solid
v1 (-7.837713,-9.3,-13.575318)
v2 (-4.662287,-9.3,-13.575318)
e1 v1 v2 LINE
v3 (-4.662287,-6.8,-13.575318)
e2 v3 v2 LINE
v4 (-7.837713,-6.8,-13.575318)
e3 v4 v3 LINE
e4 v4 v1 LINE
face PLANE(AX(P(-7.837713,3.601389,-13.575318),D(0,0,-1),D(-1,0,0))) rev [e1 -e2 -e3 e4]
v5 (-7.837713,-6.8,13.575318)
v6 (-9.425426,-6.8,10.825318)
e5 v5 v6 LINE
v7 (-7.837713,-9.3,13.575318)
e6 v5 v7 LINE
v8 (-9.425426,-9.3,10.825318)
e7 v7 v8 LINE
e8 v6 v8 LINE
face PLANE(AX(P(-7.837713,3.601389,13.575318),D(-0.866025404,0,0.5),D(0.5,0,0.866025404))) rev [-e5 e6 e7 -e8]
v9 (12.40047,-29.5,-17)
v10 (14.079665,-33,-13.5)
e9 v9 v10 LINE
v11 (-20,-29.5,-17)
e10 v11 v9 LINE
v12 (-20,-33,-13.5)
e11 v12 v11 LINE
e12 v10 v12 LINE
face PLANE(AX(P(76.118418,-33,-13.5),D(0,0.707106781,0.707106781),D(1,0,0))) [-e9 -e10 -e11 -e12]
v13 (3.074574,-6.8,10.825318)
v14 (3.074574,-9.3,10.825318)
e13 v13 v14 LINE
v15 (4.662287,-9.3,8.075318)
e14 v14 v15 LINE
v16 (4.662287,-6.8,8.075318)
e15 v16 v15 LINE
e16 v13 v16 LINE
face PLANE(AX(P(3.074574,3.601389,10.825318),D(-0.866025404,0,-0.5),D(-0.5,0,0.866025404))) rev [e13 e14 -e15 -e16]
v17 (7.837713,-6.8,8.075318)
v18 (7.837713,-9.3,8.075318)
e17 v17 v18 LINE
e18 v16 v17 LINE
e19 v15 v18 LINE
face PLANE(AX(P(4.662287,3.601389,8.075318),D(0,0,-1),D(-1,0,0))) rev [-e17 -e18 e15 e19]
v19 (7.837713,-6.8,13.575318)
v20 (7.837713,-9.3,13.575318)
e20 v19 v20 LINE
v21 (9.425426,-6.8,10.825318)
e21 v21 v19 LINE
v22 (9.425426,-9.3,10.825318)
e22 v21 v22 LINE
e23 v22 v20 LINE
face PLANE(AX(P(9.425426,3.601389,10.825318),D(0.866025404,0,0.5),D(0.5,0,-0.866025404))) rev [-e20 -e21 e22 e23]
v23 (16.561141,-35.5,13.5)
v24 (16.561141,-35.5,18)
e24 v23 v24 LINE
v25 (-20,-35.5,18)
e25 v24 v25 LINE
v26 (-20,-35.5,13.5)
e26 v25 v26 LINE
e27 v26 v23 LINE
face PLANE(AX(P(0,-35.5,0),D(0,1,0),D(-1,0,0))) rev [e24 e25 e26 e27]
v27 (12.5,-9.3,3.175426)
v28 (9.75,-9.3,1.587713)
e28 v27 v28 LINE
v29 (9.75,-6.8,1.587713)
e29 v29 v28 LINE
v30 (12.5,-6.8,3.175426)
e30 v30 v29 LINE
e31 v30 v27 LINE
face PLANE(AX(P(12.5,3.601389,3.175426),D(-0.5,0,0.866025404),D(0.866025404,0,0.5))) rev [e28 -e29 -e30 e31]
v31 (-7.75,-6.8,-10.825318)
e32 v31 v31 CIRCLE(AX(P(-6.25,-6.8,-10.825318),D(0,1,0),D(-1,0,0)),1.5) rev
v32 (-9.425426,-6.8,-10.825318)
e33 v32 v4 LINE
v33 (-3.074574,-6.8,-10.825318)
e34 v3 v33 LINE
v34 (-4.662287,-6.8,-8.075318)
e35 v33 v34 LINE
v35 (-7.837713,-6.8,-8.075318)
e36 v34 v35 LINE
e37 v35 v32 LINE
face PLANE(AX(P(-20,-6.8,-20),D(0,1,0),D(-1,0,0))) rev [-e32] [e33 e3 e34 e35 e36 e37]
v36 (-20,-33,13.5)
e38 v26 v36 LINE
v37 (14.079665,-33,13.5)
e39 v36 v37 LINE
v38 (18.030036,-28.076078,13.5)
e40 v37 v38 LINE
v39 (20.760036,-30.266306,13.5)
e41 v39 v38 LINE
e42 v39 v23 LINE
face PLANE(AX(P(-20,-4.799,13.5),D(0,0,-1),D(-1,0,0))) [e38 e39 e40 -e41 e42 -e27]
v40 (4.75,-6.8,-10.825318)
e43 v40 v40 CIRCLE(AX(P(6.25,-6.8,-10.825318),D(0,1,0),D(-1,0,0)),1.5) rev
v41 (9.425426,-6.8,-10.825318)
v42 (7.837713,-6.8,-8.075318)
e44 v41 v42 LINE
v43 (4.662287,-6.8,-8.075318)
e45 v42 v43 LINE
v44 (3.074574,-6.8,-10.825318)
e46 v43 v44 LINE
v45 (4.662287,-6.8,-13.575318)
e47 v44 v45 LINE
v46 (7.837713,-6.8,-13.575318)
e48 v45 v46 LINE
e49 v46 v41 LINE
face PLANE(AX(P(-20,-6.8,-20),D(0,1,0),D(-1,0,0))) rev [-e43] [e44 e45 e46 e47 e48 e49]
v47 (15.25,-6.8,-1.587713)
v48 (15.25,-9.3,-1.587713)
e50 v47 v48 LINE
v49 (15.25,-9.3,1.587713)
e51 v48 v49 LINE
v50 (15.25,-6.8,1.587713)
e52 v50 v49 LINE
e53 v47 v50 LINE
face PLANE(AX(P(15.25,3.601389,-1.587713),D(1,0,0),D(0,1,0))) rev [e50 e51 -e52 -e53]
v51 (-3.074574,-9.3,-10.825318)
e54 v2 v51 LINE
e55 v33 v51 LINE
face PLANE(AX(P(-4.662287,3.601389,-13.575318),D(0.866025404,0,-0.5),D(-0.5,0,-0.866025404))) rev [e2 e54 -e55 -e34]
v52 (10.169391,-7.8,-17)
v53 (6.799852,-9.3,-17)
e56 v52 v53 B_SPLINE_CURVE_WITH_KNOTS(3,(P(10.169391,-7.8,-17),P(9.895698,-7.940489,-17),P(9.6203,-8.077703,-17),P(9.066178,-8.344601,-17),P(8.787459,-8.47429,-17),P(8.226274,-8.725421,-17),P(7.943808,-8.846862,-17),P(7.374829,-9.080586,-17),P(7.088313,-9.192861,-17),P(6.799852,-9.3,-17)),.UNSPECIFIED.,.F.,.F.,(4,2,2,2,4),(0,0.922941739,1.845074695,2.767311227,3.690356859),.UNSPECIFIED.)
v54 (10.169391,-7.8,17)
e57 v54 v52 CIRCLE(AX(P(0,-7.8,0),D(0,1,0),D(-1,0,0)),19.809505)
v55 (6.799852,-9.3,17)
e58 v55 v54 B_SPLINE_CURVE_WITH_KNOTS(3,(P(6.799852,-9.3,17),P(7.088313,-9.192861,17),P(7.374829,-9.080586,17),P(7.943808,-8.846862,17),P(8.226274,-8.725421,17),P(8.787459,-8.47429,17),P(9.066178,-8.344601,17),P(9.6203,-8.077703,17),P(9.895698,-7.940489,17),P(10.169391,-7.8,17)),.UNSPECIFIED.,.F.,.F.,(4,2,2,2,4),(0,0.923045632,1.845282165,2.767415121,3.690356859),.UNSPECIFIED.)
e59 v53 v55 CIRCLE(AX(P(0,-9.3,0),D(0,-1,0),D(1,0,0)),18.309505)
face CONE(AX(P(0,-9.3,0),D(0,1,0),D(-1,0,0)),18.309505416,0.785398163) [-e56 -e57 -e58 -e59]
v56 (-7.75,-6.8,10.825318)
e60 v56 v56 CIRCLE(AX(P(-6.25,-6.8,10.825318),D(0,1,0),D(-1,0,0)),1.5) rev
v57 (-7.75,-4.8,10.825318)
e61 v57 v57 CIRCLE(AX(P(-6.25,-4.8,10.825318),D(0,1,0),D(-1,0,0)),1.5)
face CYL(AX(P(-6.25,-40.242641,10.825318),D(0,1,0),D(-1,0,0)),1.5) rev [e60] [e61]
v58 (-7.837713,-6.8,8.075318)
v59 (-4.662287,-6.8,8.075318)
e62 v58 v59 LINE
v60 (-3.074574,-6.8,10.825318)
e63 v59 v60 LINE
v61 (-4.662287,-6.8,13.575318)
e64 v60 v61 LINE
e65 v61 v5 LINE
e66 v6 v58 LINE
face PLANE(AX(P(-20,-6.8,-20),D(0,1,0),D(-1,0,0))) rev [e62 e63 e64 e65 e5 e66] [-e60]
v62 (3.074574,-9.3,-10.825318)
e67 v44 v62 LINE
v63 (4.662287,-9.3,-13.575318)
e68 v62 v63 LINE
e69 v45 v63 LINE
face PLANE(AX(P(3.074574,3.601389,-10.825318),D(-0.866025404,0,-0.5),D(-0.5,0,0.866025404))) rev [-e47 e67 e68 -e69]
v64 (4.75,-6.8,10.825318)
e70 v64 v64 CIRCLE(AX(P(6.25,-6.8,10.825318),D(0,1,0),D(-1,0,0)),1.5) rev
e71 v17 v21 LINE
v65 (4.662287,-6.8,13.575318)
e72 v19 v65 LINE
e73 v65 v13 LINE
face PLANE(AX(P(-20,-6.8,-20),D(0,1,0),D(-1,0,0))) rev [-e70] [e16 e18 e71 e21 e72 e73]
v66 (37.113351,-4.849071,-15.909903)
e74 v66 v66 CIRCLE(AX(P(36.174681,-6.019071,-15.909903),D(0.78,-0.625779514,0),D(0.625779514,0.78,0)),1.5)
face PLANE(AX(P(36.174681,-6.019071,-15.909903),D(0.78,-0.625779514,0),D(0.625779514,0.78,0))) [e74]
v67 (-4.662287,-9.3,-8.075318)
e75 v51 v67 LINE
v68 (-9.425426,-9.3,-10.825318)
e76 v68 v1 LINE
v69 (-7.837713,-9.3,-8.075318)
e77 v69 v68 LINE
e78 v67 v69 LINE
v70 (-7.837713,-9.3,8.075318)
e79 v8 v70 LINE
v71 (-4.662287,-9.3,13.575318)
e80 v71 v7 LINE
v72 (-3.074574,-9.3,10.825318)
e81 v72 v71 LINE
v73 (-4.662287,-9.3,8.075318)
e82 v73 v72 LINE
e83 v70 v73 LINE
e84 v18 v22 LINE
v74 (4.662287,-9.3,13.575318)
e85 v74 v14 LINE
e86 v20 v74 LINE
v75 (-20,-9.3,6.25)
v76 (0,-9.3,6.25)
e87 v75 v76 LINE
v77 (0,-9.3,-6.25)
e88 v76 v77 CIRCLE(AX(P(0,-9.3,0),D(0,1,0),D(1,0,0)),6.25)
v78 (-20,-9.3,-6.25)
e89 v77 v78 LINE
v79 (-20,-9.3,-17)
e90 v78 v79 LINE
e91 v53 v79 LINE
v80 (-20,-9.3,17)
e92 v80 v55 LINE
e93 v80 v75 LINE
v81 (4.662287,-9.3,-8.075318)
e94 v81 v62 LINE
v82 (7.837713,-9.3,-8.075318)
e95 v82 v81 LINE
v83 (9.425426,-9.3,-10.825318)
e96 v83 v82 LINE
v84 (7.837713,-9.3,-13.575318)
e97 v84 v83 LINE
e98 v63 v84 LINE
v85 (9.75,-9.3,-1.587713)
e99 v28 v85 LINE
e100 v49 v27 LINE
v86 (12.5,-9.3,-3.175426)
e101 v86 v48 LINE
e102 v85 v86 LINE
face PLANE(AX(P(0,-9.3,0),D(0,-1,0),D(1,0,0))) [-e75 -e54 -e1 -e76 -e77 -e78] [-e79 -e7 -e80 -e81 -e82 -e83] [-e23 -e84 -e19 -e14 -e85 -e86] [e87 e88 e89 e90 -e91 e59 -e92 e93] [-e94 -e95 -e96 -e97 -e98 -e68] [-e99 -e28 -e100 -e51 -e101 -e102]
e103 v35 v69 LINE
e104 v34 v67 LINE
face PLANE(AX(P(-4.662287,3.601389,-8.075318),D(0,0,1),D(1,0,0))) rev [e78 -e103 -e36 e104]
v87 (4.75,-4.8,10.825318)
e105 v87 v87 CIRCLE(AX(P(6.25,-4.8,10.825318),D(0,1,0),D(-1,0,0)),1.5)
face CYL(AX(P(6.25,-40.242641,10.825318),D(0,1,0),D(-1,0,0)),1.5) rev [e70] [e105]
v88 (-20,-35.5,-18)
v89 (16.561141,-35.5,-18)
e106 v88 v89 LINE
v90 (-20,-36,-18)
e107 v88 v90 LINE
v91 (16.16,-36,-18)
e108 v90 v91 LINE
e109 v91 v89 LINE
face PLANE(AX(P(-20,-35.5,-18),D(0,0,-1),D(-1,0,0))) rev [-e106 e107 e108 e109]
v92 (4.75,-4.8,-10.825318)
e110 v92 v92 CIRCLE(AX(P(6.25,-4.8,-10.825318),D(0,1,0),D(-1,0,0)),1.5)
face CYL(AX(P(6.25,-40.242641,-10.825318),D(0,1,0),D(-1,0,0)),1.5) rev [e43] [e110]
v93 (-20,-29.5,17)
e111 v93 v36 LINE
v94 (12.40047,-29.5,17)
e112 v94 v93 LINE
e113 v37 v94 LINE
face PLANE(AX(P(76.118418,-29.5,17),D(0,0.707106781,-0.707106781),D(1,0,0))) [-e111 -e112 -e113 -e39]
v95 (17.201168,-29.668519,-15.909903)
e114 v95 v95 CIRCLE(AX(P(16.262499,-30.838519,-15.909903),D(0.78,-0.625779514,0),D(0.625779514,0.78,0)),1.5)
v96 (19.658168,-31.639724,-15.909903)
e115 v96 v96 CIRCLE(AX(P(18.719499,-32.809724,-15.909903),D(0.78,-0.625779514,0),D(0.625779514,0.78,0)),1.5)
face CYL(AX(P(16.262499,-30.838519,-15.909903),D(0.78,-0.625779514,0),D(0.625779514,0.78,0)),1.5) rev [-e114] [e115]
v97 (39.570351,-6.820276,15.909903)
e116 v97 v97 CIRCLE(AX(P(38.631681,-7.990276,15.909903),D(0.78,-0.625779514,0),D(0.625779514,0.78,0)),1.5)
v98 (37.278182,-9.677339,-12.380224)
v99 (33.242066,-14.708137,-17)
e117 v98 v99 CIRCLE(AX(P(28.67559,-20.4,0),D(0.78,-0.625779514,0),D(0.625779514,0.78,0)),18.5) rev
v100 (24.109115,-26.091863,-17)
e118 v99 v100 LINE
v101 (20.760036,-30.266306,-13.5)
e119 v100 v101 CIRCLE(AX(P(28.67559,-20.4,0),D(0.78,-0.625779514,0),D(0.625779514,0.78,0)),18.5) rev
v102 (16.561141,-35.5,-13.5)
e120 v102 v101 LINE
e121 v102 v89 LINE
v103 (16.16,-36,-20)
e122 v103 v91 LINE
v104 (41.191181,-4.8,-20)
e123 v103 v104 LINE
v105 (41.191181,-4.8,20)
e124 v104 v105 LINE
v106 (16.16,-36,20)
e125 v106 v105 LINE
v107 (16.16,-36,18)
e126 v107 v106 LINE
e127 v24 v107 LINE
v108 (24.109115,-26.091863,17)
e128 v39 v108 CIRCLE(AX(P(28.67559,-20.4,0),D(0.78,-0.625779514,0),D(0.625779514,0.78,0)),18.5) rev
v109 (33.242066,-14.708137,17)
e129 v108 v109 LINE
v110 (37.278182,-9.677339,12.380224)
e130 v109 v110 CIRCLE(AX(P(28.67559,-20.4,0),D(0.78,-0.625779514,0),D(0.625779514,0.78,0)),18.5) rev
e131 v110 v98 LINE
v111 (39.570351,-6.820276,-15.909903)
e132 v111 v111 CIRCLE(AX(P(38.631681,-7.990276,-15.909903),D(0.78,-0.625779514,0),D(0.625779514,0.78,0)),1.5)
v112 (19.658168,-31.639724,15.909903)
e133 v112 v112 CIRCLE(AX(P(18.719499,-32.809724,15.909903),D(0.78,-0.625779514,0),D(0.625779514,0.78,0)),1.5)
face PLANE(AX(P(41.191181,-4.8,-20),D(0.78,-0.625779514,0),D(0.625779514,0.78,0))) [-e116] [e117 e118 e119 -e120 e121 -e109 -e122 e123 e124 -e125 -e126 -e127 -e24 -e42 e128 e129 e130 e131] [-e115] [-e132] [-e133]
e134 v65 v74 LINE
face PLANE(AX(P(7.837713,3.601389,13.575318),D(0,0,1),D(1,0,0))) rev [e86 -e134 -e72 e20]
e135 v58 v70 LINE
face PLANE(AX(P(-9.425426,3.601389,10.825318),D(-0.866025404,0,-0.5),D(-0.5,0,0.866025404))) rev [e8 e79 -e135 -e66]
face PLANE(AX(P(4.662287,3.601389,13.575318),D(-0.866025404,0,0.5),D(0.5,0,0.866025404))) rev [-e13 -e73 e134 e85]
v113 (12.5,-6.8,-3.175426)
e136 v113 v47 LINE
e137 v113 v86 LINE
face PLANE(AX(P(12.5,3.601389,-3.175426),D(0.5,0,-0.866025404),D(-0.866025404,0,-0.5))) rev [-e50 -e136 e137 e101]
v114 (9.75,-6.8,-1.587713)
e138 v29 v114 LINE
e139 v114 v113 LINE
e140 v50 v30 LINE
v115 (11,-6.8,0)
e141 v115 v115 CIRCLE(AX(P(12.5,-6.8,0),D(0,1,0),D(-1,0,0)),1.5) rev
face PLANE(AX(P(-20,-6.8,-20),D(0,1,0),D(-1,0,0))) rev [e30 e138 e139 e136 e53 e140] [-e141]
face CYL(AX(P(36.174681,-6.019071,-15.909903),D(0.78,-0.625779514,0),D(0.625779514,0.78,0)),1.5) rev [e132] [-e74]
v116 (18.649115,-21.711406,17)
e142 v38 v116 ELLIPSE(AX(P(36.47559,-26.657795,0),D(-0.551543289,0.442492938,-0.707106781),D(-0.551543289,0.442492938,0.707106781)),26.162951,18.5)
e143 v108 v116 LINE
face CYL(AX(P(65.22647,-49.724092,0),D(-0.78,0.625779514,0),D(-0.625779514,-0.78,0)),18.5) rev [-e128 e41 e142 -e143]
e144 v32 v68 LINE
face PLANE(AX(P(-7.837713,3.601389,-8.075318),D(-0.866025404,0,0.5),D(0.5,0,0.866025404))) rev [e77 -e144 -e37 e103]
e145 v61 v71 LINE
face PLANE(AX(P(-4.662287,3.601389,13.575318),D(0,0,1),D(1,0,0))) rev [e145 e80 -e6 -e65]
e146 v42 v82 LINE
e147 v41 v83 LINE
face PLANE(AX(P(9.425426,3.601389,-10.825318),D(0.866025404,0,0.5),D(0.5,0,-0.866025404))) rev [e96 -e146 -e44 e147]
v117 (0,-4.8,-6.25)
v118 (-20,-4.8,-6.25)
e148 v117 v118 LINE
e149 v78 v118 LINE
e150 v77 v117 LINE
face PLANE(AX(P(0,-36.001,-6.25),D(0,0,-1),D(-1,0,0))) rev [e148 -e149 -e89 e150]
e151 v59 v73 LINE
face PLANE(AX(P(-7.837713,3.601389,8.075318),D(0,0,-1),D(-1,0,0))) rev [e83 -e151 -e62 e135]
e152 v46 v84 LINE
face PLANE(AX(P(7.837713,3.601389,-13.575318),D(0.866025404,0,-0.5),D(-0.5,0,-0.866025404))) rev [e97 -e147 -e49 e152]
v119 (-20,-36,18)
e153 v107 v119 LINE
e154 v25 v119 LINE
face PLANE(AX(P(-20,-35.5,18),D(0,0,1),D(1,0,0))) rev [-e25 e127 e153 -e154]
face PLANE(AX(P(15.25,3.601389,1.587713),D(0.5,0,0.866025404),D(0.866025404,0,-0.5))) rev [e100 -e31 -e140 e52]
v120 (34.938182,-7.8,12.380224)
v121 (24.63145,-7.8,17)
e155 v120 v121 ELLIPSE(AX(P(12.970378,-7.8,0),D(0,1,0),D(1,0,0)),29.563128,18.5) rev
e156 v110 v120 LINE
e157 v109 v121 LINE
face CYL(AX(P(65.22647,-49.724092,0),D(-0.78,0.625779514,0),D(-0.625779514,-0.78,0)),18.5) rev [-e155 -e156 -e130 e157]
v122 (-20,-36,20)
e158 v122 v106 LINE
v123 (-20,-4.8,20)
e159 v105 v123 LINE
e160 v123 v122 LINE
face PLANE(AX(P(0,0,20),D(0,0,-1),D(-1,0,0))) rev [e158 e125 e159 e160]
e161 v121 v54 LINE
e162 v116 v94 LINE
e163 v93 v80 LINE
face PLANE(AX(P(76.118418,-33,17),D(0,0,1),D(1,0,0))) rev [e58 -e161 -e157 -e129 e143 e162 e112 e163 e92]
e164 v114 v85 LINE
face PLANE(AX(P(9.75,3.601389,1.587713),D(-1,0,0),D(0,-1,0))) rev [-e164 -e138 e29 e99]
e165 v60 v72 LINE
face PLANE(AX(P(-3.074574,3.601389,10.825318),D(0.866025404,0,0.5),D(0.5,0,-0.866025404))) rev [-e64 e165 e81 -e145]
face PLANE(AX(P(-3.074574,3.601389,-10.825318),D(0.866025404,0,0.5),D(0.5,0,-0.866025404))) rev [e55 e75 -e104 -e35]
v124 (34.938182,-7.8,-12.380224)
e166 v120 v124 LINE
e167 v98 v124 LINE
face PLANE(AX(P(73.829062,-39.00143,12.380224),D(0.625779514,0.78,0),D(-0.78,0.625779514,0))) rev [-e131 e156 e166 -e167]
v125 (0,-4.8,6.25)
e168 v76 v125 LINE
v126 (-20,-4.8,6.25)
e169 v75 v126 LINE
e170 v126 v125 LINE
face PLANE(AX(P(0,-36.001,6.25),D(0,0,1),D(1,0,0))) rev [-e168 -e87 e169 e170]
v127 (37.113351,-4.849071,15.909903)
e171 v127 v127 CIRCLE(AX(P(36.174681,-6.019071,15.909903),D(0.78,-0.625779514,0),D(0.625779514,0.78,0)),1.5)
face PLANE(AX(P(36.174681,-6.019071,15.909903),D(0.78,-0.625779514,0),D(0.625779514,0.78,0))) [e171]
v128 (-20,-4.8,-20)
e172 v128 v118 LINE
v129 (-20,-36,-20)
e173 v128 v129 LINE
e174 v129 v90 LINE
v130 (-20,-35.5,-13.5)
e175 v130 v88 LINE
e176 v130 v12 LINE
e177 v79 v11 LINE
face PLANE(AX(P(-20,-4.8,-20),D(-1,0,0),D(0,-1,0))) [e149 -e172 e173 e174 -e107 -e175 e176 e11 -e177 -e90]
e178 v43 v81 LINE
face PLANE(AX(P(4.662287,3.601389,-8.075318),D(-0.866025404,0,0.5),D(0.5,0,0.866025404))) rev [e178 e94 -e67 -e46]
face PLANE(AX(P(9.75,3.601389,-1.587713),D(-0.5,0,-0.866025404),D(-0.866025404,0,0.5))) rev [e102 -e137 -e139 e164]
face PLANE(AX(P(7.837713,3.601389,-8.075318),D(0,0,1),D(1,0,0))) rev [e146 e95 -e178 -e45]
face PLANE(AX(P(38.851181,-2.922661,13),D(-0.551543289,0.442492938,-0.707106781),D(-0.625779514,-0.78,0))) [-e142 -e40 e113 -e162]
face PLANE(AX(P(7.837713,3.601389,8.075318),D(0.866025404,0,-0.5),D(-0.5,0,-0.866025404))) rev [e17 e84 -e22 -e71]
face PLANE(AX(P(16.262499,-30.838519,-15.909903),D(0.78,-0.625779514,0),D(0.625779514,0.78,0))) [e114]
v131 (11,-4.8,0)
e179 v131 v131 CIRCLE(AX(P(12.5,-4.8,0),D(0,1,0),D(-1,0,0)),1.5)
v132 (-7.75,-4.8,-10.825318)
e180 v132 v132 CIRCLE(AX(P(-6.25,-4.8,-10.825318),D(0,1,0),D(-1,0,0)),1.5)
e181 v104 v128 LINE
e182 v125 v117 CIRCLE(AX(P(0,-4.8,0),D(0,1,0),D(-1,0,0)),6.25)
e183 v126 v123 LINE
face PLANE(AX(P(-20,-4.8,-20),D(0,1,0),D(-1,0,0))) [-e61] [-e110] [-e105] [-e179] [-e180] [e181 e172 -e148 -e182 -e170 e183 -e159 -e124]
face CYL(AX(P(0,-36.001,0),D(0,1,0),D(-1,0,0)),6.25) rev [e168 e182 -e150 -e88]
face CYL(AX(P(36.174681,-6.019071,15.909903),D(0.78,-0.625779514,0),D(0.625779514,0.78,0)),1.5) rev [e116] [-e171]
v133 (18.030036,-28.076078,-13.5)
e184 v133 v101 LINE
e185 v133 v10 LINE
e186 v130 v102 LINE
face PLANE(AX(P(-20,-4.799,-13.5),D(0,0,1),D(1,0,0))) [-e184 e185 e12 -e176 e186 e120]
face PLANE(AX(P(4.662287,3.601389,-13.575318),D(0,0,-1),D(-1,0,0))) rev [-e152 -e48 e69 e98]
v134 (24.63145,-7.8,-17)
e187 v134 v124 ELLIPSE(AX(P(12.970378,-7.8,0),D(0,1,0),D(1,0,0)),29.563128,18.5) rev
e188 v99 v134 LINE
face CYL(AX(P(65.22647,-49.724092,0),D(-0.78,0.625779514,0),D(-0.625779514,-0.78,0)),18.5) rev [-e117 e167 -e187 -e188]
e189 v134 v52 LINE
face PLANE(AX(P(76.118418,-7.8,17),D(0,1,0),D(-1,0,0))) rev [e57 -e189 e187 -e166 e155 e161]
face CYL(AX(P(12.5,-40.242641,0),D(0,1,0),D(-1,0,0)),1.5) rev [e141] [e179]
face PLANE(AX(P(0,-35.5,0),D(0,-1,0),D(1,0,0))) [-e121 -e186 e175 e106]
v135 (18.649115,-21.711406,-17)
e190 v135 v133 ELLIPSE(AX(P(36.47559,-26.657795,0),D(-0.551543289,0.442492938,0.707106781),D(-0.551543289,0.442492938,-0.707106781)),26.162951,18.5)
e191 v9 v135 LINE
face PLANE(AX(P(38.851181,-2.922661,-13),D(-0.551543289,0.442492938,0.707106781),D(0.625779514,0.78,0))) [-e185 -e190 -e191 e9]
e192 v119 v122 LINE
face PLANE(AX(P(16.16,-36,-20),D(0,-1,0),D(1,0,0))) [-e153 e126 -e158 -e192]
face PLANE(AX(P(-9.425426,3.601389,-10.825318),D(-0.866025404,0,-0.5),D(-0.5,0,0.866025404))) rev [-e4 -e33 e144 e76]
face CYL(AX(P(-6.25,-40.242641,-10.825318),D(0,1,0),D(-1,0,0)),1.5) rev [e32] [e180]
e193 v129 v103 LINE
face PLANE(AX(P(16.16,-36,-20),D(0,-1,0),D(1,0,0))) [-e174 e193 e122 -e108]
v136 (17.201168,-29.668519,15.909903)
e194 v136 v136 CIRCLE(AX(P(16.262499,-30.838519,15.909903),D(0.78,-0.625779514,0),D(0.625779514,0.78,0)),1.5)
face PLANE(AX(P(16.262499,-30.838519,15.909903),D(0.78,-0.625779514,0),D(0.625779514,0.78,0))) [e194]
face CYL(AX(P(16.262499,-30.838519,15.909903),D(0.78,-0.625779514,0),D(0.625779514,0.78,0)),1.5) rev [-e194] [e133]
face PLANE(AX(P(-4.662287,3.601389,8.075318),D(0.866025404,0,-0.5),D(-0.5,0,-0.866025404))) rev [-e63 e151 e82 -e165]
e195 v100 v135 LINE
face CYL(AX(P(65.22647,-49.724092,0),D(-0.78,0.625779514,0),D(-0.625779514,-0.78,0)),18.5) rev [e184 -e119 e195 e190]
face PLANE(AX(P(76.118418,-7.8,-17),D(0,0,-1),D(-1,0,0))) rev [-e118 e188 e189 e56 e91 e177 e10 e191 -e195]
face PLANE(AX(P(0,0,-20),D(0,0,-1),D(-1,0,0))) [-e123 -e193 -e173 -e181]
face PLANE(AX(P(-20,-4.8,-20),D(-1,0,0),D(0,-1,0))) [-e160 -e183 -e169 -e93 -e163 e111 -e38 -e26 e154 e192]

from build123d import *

# Parameters (mm, degrees)
BOSS_EXTRUDE1_DEPTH            = 20
BOSS_EXTRUDE1_DEPTH_BACK       = 20
CUT_EXTRUDE1_REACH             = 75.759
SKETCH3_W                      = 34
SKETCH3_H                      = 25.2
CUT_EXTRUDE2_DEPTH             = 3
CUT_EXTRUDE3_REACH             = 57.409
CUT_EXTRUDE4_REACH             = 57.409
SKETCH7_R                      = 1.5
SKETCH6_R                      = 1.5
BOSS_EXTRUDE2_DEPTH            = 1.5
CHAMFER3_SIZE                  = 1.5
CUT_EXTRUDE5_DEPTH             = 2.5
CUT_EXTRUDE6_REACH             = 55.777
SKETCH9_W                      = 44.905987645
SKETCH9_H                      = 27
CUT_EXTRUDE6_DIRECTION_2_REACH = 55.777
BOSS_EXTRUDE3_REACH            = 53.8
CHAMFER1_SIZE                  = 4
CHAMFER2_SIZE                  = 3.5
SKETCH11_W                     = 40.505645026
SKETCH11_H                     = 4.5
CUT_EXTRUDE7_DEPTH             = 0.5
SKETCH13_R                     = 1.5
CUT_EXTRUDE8_DEPTH             = 3.15


# Some blends are built 0.0001 mm under size
with BuildPart() as part:
    # Sketch1 → Boss-Extrude1 (new, two sides: drawn at the far end of the back side and taken through both)
    with BuildSketch(Plane.XY.offset(-BOSS_EXTRUDE1_DEPTH_BACK)):
        Polygon((-20, -4.8), (41.191180555, -4.8), (16.16, -36), (-20, -36), align=None)
    extrude(amount=BOSS_EXTRUDE1_DEPTH + BOSS_EXTRUDE1_DEPTH_BACK)

    # Cut-Extrude1: up to this plane
    cut_extrude1_end = Plane(origin=(38.851180555, -2.922661458, -20), z_dir=(0.7799999999999999, -0.6257795138864808, 0))
    # Sketch3 → Cut-Extrude1 (cut, up to the surface)
    with BuildSketch(Plane.ZY.offset(20), mode=Mode.PRIVATE) as cut_extrude1_sk1:
        with Locations((0, -20.4)):
            Rectangle(SKETCH3_W, SKETCH3_H)
    cut_extrude1_tool1 = split(extrude(cut_extrude1_sk1.sketch, amount=-CUT_EXTRUDE1_REACH, mode=Mode.PRIVATE), bisect_by=cut_extrude1_end, keep=Keep.BOTH, mode=Mode.PRIVATE)
    add(cut_extrude1_tool1.solids().sort_by_distance((-20, -20.4, 0))[0], mode=Mode.SUBTRACT)

    # Sketch4 → Cut-Extrude2 (cut)
    with BuildSketch(Plane(origin=(25.06363275, -20.108087075, 0), x_dir=(0, 0, 1), z_dir=(-0.78, 0.6257795138864807, 0))):
        with BuildLine():
            Line((-17, 9.329856704), (-17, -5.264662815))
            ThreePointArc((-17, -5.264662815), (0, -16.467403056), (17, -5.264662815))
            Line((17, -5.264662815), (17, 9.329856704))
            ThreePointArc((17, 9.329856704), (15.039919545, 12.805285563), (12.38022373, 15.779598814))
            Line((12.38022373, 15.779598814), (-12.38022373, 15.779598814))
            ThreePointArc((-12.38022373, 15.779598814), (-15.039919545, 12.805285563), (-17, 9.329856704))
        make_face()
    extrude(amount=-CUT_EXTRUDE2_DEPTH, mode=Mode.SUBTRACT)

    # Sketch5 → Cut-Extrude3 (cut, up to next)
    with BuildSketch(Plane(origin=(0, -4.8, 0), x_dir=(1, 0, 0), z_dir=(0, 1, 0)), mode=Mode.PRIVATE) as cut_extrude3_sk1:
        with BuildLine():
            Line((0, 6.25), (-20, 6.25))
            Line((-20, 6.25), (-20, -6.25))
            Line((-20, -6.25), (0, -6.25))
            ThreePointArc((0, -6.25), (6.25, 0), (0, 6.25))
        make_face()
    cut_extrude3_tool1 = extrude(cut_extrude3_sk1.sketch, amount=-CUT_EXTRUDE3_REACH, mode=Mode.PRIVATE) & part.part
    add(cut_extrude3_tool1.solids().sort_by_distance((-7.506569, -4.8, 0))[0], mode=Mode.SUBTRACT)

    # Cut-Extrude4: up to this face of the body (flat: up to its plane)
    cut_extrude4_end = Plane(part.part.faces().sort_by_distance((-1.92, -36, 0))[0])
    # Sketch7 → Cut-Extrude4 (cut, up to the picked face)
    with BuildSketch(Plane(origin=(0, -4.8, 0), x_dir=(1, 0, 0), z_dir=(0, 1, 0)), mode=Mode.PRIVATE) as cut_extrude4_sk1:
        with Locations(Location((12.5, 0, 0), (0, 0, 180))):
            Circle(SKETCH7_R)
    cut_extrude4_tool1 = split(extrude(cut_extrude4_sk1.sketch, amount=-CUT_EXTRUDE4_REACH, mode=Mode.PRIVATE), bisect_by=cut_extrude4_end, keep=Keep.BOTH, mode=Mode.PRIVATE)
    # Sketch7 → Cut-Extrude4 (cut, up to the picked face)
    with BuildSketch(Plane(origin=(0, -4.8, 0), x_dir=(1, 0, 0), z_dir=(0, 1, 0)), mode=Mode.PRIVATE) as cut_extrude4_sk2:
        with Locations(Location((6.25, -10.825317547, 0), (0, 0, 180))):
            Circle(SKETCH7_R)
    cut_extrude4_tool2 = split(extrude(cut_extrude4_sk2.sketch, amount=-CUT_EXTRUDE4_REACH, mode=Mode.PRIVATE), bisect_by=cut_extrude4_end, keep=Keep.BOTH, mode=Mode.PRIVATE)
    # Sketch7 → Cut-Extrude4 (cut, up to the picked face)
    with BuildSketch(Plane(origin=(0, -4.8, 0), x_dir=(1, 0, 0), z_dir=(0, 1, 0)), mode=Mode.PRIVATE) as cut_extrude4_sk3:
        with Locations(Location((-6.25, -10.825317547, 0), (0, 0, 180))):
            Circle(SKETCH7_R)
    cut_extrude4_tool3 = split(extrude(cut_extrude4_sk3.sketch, amount=-CUT_EXTRUDE4_REACH, mode=Mode.PRIVATE), bisect_by=cut_extrude4_end, keep=Keep.BOTH, mode=Mode.PRIVATE)
    # Sketch7 → Cut-Extrude4 (cut, up to the picked face)
    with BuildSketch(Plane(origin=(0, -4.8, 0), x_dir=(1, 0, 0), z_dir=(0, 1, 0)), mode=Mode.PRIVATE) as cut_extrude4_sk4:
        with Locations((-12.5, 0)):
            Circle(SKETCH7_R)
    cut_extrude4_tool4 = split(extrude(cut_extrude4_sk4.sketch, amount=-CUT_EXTRUDE4_REACH, mode=Mode.PRIVATE), bisect_by=cut_extrude4_end, keep=Keep.BOTH, mode=Mode.PRIVATE)
    # Sketch7 → Cut-Extrude4 (cut, up to the picked face)
    with BuildSketch(Plane(origin=(0, -4.8, 0), x_dir=(1, 0, 0), z_dir=(0, 1, 0)), mode=Mode.PRIVATE) as cut_extrude4_sk5:
        with Locations(Location((-6.25, 10.825317547, 0), (0, 0, 180))):
            Circle(SKETCH7_R)
    cut_extrude4_tool5 = split(extrude(cut_extrude4_sk5.sketch, amount=-CUT_EXTRUDE4_REACH, mode=Mode.PRIVATE), bisect_by=cut_extrude4_end, keep=Keep.BOTH, mode=Mode.PRIVATE)
    # Sketch7 → Cut-Extrude4 (cut, up to the picked face)
    with BuildSketch(Plane(origin=(0, -4.8, 0), x_dir=(1, 0, 0), z_dir=(0, 1, 0)), mode=Mode.PRIVATE) as cut_extrude4_sk6:
        with Locations(Location((6.25, 10.825317547, 0), (0, 0, 180))):
            Circle(SKETCH7_R)
    cut_extrude4_tool6 = split(extrude(cut_extrude4_sk6.sketch, amount=-CUT_EXTRUDE4_REACH, mode=Mode.PRIVATE), bisect_by=cut_extrude4_end, keep=Keep.BOTH, mode=Mode.PRIVATE)
    add(cut_extrude4_tool1.solids().sort_by(Axis((12.5, -4.8, 0), (0, -1, 0)))[0], mode=Mode.SUBTRACT)
    add(cut_extrude4_tool2.solids().sort_by(Axis((6.25, -4.8, 10.825318), (0, -1, 0)))[0], mode=Mode.SUBTRACT)
    add(cut_extrude4_tool3.solids().sort_by(Axis((-6.25, -4.8, 10.825318), (0, -1, 0)))[0], mode=Mode.SUBTRACT)
    add(cut_extrude4_tool4.solids().sort_by(Axis((-12.5, -4.8, 0), (0, -1, 0)))[0], mode=Mode.SUBTRACT)
    add(cut_extrude4_tool5.solids().sort_by(Axis((-6.25, -4.8, -10.825318), (0, -1, 0)))[0], mode=Mode.SUBTRACT)
    add(cut_extrude4_tool6.solids().sort_by(Axis((6.25, -4.8, -10.825318), (0, -1, 0)))[0], mode=Mode.SUBTRACT)

    # Sketch6 → Boss-Extrude2 (add)
    with BuildSketch(Plane.XZ.offset(7.8)):
        with BuildLine():
            Line((0, 6.25), (-17.209749811, 6.25))
            Line((-17.209749811, 6.25), (-20, 6.25))
            Line((-20, 6.25), (-20, 18.309505416))
            Line((-20, 18.309505416), (0, 18.309505416))
            ThreePointArc((0, 18.309505416), (18.309505416, 0), (0, -18.309505416))
            Line((0, -18.309505416), (-20, -18.309505416))
            Line((-20, -18.309505416), (-20, -6.25))
            Line((-20, -6.25), (-17.209749811, -6.25))
            Line((-17.209749811, -6.25), (0, -6.25))
            ThreePointArc((0, -6.25), (6.25, 0), (0, 6.25))
        make_face()
        with Locations(Location((-6.25, 10.825317547, 0), (0, 0, 180))):
            Circle(SKETCH6_R, mode=Mode.SUBTRACT)
        with Locations(Location((6.25, 10.825317547, 0), (0, 0, 180))):
            Circle(SKETCH6_R, mode=Mode.SUBTRACT)
        with Locations(Location((12.5, 0, 0), (0, 0, 180))):
            Circle(SKETCH6_R, mode=Mode.SUBTRACT)
        with Locations(Location((6.25, -10.825317547, 0), (0, 0, 180))):
            Circle(SKETCH6_R, mode=Mode.SUBTRACT)
        with Locations(Location((-6.25, -10.825317547, 0), (0, 0, 180))):
            Circle(SKETCH6_R, mode=Mode.SUBTRACT)
    extrude(amount=BOSS_EXTRUDE2_DEPTH)

    # Chamfer3
    chamfer3_edges = [part.edges().sort_by_distance(p)[0] for p in [
        (18.309505416, -7.8, 0),
    ]]
    chamfer(chamfer3_edges, length=CHAMFER3_SIZE - 0.0001)  # a hair under: the kernel refuses the full size

    # Sketch8 → Cut-Extrude5 (cut)
    with BuildSketch(Plane.XZ.offset(9.3)):
        Polygon((12.5, 3.175426481), (9.75, 1.58771324), (9.75, -1.58771324), (12.5, -3.175426481), (15.25, -1.58771324), (15.25, 1.58771324), align=None)
        Polygon((9.425426481, 10.825317547), (7.83771324, 13.575317547), (4.66228676, 13.575317547), (3.074573519, 10.825317547), (4.66228676, 8.075317547), (7.83771324, 8.075317547), align=None)
        Polygon((-3.074573519, 10.825317547), (-4.66228676, 13.575317547), (-7.83771324, 13.575317547), (-9.425426481, 10.825317547), (-7.83771324, 8.075317547), (-4.66228676, 8.075317547), align=None)
        Polygon((-3.074573519, -10.825317547), (-4.66228676, -8.075317547), (-7.83771324, -8.075317547), (-9.425426481, -10.825317547), (-7.83771324, -13.575317547), (-4.66228676, -13.575317547), align=None)
        Polygon((9.425426481, -10.825317547), (7.83771324, -8.075317547), (4.66228676, -8.075317547), (3.074573519, -10.825317547), (4.66228676, -13.575317547), (7.83771324, -13.575317547), align=None)
    extrude(amount=-CUT_EXTRUDE5_DEPTH, mode=Mode.SUBTRACT)

    # Sketch9 → Cut-Extrude6 (cut, up to next)
    with BuildSketch(Plane(origin=(0, -33, 0), x_dir=(1, 0, 0), z_dir=(0, 1, 0)), mode=Mode.PRIVATE) as cut_extrude6_sk1:
        with Locations((2.452993823, 0)):
            Rectangle(SKETCH9_W, SKETCH9_H)
    cut_extrude6_tool1 = extrude(cut_extrude6_sk1.sketch, amount=-CUT_EXTRUDE6_REACH, mode=Mode.PRIVATE) & part.part
    add(cut_extrude6_tool1.solids().sort_by_distance((2.452994, -33, 0))[0], mode=Mode.SUBTRACT)

    # Sketch9 → Cut-Extrude6 direction 2 (cut, up to next)
    with BuildSketch(Plane(origin=(0, -33, 0), x_dir=(1, 0, 0), z_dir=(0, 1, 0)), mode=Mode.PRIVATE) as cut_extrude6_direction_2_sk1:
        with Locations((2.452993823, 0)):
            Rectangle(SKETCH9_W, SKETCH9_H)
    cut_extrude6_direction_2_tool1 = extrude(cut_extrude6_direction_2_sk1.sketch, amount=CUT_EXTRUDE6_DIRECTION_2_REACH, mode=Mode.PRIVATE) & part.part
    add(cut_extrude6_direction_2_tool1.solids().sort_by_distance((2.452994, -33, 0))[0], mode=Mode.SUBTRACT)

    # Sketch10 → Boss-Extrude3 (add, up to next)
    with BuildSketch(Plane(origin=(25.06363275, -20.108087075, 0), x_dir=(0, 0, 1), z_dir=(-0.78, 0.6257795138864807, 0)), mode=Mode.PRIVATE) as boss_extrude3_sk1:
        with BuildLine():
            Line((17, 9.329856704), (17, 15.779598814))
            Line((17, 15.779598814), (12.38022373, 15.779598814))
            ThreePointArc((12.38022373, 15.779598814), (15.039919545, 12.805285563), (17, 9.329856704))
        make_face()
    boss_extrude3_tool1 = extrude(boss_extrude3_sk1.sketch, amount=BOSS_EXTRUDE3_REACH, mode=Mode.PRIVATE) - part.part
    # Sketch10 → Boss-Extrude3 (add, up to next)
    with BuildSketch(Plane(origin=(25.06363275, -20.108087075, 0), x_dir=(0, 0, 1), z_dir=(-0.78, 0.6257795138864807, 0)), mode=Mode.PRIVATE) as boss_extrude3_sk2:
        with BuildLine():
            Line((-12.38022373, 15.779598814), (-17, 15.779598814))
            Line((-17, 15.779598814), (-17, 9.329856704))
            ThreePointArc((-17, 9.329856704), (-15.039919545, 12.805285563), (-12.38022373, 15.779598814))
        make_face()
    boss_extrude3_tool2 = extrude(boss_extrude3_sk2.sketch, amount=BOSS_EXTRUDE3_REACH, mode=Mode.PRIVATE) - part.part
    add(boss_extrude3_tool1.solids().sort_by_distance((33.70308, -9.339488, 15.573959))[0])
    add(boss_extrude3_tool2.solids().sort_by_distance((33.70308, -9.339488, -15.573959))[0])

    # Chamfer1
    # the kernel refuses this chamfer: 4 mm, written as the material it adds along each edge
    with BuildSketch(Plane(origin=(28.206340733, -16.190873148, -17), x_dir=(-0.7797050951908114, 0.6255429172350234, -0.02749587661058647), z_dir=(-0.6257795138864808, -0.7799999999999999, 0))) as chamfer1_piece_1_section:
        Polygon((CHAMFER1_SIZE * 0.999621916911, -CHAMFER1_SIZE * 0.0274958766106), (-CHAMFER1_SIZE * 0.0274958766106, -CHAMFER1_SIZE * 0.999621916911), (0, 0), align=None)
    chamfer1_piece_1 = extrude(amount=31.836894582, mode=Mode.PRIVATE)
    chamfer1_piece_1 = split(chamfer1_piece_1, bisect_by=Plane(origin=(16.061091739, -28.954015424, -13.5), z_dir=(0, 0, -1)), keep=Keep.TOP, mode=Mode.PRIVATE)
    chamfer1_piece_1 = split(chamfer1_piece_1, bisect_by=Plane(origin=(16.061091739, -33, -15.864251998), z_dir=(0, 1, 0)), keep=Keep.TOP, mode=Mode.PRIVATE)
    chamfer1_piece_1 = chamfer1_piece_1 - Plane(origin=(25.176212906, -17.592514525, 0), x_dir=(-0.24683652243813084, -0.30766824932634074, -0.9189189189189191), z_dir=(-0.78, 0.6257795138864807, 0)) * Cylinder(18.5, 80, mode=Mode.PRIVATE)
    add(chamfer1_piece_1)
    with BuildSketch(Plane(origin=(8.283464318, -41.023650922, 17), x_dir=(-0.7797050951908113, 0.6255429172350233, 0.02749587661058642), z_dir=(0.6257795138864808, 0.7799999999999999, 0))) as chamfer1_piece_2_section:
        Polygon((CHAMFER1_SIZE * 0.999621916911, -CHAMFER1_SIZE * 0.0274958766106), (-CHAMFER1_SIZE * 0.0274958766106, -CHAMFER1_SIZE * 0.999621916911), (0, 0), align=None)
    chamfer1_piece_2 = extrude(amount=31.836894582, mode=Mode.PRIVATE)
    chamfer1_piece_2 = split(chamfer1_piece_2, bisect_by=Plane(origin=(16.061091739, -28.954015425, 13.5), z_dir=(0, 0, 1)), keep=Keep.TOP, mode=Mode.PRIVATE)
    chamfer1_piece_2 = chamfer1_piece_2 - Plane(origin=(25.176212906, -17.592514525, 0), x_dir=(-0.24683652243813084, -0.30766824932634074, -0.9189189189189191), z_dir=(-0.78, 0.6257795138864807, 0)) * Cylinder(18.5, 80, mode=Mode.PRIVATE)
    chamfer1_piece_2 = split(chamfer1_piece_2, bisect_by=Plane(origin=(16.061091739, -33, 15.864251998), z_dir=(0, 1, 0)), keep=Keep.TOP, mode=Mode.PRIVATE)
    add(chamfer1_piece_2)

    # Chamfer2
    chamfer2_edges = [part.edges().sort_by_distance(p)[0] for p in [
        (-5.203757345, -33, -17),
        (-5.203757345, -33, 17),
    ]]
    chamfer(chamfer2_edges, length=CHAMFER2_SIZE - 0.0001)  # a hair under: the kernel refuses the full size

    # Sketch11 → Cut-Extrude7 (cut)
    with BuildSketch(Plane.XZ.offset(36)):
        with Locations((0.252822513, 15.75)):
            Rectangle(SKETCH11_W, SKETCH11_H)
        with Locations((0.252822513, -15.75)):
            Rectangle(SKETCH11_W, SKETCH11_H)
    extrude(amount=-CUT_EXTRUDE7_DEPTH, mode=Mode.SUBTRACT)

    # Sketch13 → Cut-Extrude8 (cut)
    with BuildSketch(Plane(origin=(27.40363275, -21.985425617, 0), x_dir=(0, 0, -1), z_dir=(0.7799999999999998, -0.6257795138864808, 0))):
        with Locations(Location((-15.909902577, 17.942499521, 0), (0, 0, 90))):
            Circle(SKETCH13_R)
        with Locations(Location((15.909902577, 17.942499521, 0), (0, 0, 90))):
            Circle(SKETCH13_R)
        with Locations(Location((15.909902577, -13.877305632, 0), (0, 0, 90))):
            Circle(SKETCH13_R)
        with Locations(Location((-15.909902577, -13.877305632, 0), (0, 0, 90))):
            Circle(SKETCH13_R)
    extrude(amount=-CUT_EXTRUDE8_DEPTH, mode=Mode.SUBTRACT)


solid = part.part
